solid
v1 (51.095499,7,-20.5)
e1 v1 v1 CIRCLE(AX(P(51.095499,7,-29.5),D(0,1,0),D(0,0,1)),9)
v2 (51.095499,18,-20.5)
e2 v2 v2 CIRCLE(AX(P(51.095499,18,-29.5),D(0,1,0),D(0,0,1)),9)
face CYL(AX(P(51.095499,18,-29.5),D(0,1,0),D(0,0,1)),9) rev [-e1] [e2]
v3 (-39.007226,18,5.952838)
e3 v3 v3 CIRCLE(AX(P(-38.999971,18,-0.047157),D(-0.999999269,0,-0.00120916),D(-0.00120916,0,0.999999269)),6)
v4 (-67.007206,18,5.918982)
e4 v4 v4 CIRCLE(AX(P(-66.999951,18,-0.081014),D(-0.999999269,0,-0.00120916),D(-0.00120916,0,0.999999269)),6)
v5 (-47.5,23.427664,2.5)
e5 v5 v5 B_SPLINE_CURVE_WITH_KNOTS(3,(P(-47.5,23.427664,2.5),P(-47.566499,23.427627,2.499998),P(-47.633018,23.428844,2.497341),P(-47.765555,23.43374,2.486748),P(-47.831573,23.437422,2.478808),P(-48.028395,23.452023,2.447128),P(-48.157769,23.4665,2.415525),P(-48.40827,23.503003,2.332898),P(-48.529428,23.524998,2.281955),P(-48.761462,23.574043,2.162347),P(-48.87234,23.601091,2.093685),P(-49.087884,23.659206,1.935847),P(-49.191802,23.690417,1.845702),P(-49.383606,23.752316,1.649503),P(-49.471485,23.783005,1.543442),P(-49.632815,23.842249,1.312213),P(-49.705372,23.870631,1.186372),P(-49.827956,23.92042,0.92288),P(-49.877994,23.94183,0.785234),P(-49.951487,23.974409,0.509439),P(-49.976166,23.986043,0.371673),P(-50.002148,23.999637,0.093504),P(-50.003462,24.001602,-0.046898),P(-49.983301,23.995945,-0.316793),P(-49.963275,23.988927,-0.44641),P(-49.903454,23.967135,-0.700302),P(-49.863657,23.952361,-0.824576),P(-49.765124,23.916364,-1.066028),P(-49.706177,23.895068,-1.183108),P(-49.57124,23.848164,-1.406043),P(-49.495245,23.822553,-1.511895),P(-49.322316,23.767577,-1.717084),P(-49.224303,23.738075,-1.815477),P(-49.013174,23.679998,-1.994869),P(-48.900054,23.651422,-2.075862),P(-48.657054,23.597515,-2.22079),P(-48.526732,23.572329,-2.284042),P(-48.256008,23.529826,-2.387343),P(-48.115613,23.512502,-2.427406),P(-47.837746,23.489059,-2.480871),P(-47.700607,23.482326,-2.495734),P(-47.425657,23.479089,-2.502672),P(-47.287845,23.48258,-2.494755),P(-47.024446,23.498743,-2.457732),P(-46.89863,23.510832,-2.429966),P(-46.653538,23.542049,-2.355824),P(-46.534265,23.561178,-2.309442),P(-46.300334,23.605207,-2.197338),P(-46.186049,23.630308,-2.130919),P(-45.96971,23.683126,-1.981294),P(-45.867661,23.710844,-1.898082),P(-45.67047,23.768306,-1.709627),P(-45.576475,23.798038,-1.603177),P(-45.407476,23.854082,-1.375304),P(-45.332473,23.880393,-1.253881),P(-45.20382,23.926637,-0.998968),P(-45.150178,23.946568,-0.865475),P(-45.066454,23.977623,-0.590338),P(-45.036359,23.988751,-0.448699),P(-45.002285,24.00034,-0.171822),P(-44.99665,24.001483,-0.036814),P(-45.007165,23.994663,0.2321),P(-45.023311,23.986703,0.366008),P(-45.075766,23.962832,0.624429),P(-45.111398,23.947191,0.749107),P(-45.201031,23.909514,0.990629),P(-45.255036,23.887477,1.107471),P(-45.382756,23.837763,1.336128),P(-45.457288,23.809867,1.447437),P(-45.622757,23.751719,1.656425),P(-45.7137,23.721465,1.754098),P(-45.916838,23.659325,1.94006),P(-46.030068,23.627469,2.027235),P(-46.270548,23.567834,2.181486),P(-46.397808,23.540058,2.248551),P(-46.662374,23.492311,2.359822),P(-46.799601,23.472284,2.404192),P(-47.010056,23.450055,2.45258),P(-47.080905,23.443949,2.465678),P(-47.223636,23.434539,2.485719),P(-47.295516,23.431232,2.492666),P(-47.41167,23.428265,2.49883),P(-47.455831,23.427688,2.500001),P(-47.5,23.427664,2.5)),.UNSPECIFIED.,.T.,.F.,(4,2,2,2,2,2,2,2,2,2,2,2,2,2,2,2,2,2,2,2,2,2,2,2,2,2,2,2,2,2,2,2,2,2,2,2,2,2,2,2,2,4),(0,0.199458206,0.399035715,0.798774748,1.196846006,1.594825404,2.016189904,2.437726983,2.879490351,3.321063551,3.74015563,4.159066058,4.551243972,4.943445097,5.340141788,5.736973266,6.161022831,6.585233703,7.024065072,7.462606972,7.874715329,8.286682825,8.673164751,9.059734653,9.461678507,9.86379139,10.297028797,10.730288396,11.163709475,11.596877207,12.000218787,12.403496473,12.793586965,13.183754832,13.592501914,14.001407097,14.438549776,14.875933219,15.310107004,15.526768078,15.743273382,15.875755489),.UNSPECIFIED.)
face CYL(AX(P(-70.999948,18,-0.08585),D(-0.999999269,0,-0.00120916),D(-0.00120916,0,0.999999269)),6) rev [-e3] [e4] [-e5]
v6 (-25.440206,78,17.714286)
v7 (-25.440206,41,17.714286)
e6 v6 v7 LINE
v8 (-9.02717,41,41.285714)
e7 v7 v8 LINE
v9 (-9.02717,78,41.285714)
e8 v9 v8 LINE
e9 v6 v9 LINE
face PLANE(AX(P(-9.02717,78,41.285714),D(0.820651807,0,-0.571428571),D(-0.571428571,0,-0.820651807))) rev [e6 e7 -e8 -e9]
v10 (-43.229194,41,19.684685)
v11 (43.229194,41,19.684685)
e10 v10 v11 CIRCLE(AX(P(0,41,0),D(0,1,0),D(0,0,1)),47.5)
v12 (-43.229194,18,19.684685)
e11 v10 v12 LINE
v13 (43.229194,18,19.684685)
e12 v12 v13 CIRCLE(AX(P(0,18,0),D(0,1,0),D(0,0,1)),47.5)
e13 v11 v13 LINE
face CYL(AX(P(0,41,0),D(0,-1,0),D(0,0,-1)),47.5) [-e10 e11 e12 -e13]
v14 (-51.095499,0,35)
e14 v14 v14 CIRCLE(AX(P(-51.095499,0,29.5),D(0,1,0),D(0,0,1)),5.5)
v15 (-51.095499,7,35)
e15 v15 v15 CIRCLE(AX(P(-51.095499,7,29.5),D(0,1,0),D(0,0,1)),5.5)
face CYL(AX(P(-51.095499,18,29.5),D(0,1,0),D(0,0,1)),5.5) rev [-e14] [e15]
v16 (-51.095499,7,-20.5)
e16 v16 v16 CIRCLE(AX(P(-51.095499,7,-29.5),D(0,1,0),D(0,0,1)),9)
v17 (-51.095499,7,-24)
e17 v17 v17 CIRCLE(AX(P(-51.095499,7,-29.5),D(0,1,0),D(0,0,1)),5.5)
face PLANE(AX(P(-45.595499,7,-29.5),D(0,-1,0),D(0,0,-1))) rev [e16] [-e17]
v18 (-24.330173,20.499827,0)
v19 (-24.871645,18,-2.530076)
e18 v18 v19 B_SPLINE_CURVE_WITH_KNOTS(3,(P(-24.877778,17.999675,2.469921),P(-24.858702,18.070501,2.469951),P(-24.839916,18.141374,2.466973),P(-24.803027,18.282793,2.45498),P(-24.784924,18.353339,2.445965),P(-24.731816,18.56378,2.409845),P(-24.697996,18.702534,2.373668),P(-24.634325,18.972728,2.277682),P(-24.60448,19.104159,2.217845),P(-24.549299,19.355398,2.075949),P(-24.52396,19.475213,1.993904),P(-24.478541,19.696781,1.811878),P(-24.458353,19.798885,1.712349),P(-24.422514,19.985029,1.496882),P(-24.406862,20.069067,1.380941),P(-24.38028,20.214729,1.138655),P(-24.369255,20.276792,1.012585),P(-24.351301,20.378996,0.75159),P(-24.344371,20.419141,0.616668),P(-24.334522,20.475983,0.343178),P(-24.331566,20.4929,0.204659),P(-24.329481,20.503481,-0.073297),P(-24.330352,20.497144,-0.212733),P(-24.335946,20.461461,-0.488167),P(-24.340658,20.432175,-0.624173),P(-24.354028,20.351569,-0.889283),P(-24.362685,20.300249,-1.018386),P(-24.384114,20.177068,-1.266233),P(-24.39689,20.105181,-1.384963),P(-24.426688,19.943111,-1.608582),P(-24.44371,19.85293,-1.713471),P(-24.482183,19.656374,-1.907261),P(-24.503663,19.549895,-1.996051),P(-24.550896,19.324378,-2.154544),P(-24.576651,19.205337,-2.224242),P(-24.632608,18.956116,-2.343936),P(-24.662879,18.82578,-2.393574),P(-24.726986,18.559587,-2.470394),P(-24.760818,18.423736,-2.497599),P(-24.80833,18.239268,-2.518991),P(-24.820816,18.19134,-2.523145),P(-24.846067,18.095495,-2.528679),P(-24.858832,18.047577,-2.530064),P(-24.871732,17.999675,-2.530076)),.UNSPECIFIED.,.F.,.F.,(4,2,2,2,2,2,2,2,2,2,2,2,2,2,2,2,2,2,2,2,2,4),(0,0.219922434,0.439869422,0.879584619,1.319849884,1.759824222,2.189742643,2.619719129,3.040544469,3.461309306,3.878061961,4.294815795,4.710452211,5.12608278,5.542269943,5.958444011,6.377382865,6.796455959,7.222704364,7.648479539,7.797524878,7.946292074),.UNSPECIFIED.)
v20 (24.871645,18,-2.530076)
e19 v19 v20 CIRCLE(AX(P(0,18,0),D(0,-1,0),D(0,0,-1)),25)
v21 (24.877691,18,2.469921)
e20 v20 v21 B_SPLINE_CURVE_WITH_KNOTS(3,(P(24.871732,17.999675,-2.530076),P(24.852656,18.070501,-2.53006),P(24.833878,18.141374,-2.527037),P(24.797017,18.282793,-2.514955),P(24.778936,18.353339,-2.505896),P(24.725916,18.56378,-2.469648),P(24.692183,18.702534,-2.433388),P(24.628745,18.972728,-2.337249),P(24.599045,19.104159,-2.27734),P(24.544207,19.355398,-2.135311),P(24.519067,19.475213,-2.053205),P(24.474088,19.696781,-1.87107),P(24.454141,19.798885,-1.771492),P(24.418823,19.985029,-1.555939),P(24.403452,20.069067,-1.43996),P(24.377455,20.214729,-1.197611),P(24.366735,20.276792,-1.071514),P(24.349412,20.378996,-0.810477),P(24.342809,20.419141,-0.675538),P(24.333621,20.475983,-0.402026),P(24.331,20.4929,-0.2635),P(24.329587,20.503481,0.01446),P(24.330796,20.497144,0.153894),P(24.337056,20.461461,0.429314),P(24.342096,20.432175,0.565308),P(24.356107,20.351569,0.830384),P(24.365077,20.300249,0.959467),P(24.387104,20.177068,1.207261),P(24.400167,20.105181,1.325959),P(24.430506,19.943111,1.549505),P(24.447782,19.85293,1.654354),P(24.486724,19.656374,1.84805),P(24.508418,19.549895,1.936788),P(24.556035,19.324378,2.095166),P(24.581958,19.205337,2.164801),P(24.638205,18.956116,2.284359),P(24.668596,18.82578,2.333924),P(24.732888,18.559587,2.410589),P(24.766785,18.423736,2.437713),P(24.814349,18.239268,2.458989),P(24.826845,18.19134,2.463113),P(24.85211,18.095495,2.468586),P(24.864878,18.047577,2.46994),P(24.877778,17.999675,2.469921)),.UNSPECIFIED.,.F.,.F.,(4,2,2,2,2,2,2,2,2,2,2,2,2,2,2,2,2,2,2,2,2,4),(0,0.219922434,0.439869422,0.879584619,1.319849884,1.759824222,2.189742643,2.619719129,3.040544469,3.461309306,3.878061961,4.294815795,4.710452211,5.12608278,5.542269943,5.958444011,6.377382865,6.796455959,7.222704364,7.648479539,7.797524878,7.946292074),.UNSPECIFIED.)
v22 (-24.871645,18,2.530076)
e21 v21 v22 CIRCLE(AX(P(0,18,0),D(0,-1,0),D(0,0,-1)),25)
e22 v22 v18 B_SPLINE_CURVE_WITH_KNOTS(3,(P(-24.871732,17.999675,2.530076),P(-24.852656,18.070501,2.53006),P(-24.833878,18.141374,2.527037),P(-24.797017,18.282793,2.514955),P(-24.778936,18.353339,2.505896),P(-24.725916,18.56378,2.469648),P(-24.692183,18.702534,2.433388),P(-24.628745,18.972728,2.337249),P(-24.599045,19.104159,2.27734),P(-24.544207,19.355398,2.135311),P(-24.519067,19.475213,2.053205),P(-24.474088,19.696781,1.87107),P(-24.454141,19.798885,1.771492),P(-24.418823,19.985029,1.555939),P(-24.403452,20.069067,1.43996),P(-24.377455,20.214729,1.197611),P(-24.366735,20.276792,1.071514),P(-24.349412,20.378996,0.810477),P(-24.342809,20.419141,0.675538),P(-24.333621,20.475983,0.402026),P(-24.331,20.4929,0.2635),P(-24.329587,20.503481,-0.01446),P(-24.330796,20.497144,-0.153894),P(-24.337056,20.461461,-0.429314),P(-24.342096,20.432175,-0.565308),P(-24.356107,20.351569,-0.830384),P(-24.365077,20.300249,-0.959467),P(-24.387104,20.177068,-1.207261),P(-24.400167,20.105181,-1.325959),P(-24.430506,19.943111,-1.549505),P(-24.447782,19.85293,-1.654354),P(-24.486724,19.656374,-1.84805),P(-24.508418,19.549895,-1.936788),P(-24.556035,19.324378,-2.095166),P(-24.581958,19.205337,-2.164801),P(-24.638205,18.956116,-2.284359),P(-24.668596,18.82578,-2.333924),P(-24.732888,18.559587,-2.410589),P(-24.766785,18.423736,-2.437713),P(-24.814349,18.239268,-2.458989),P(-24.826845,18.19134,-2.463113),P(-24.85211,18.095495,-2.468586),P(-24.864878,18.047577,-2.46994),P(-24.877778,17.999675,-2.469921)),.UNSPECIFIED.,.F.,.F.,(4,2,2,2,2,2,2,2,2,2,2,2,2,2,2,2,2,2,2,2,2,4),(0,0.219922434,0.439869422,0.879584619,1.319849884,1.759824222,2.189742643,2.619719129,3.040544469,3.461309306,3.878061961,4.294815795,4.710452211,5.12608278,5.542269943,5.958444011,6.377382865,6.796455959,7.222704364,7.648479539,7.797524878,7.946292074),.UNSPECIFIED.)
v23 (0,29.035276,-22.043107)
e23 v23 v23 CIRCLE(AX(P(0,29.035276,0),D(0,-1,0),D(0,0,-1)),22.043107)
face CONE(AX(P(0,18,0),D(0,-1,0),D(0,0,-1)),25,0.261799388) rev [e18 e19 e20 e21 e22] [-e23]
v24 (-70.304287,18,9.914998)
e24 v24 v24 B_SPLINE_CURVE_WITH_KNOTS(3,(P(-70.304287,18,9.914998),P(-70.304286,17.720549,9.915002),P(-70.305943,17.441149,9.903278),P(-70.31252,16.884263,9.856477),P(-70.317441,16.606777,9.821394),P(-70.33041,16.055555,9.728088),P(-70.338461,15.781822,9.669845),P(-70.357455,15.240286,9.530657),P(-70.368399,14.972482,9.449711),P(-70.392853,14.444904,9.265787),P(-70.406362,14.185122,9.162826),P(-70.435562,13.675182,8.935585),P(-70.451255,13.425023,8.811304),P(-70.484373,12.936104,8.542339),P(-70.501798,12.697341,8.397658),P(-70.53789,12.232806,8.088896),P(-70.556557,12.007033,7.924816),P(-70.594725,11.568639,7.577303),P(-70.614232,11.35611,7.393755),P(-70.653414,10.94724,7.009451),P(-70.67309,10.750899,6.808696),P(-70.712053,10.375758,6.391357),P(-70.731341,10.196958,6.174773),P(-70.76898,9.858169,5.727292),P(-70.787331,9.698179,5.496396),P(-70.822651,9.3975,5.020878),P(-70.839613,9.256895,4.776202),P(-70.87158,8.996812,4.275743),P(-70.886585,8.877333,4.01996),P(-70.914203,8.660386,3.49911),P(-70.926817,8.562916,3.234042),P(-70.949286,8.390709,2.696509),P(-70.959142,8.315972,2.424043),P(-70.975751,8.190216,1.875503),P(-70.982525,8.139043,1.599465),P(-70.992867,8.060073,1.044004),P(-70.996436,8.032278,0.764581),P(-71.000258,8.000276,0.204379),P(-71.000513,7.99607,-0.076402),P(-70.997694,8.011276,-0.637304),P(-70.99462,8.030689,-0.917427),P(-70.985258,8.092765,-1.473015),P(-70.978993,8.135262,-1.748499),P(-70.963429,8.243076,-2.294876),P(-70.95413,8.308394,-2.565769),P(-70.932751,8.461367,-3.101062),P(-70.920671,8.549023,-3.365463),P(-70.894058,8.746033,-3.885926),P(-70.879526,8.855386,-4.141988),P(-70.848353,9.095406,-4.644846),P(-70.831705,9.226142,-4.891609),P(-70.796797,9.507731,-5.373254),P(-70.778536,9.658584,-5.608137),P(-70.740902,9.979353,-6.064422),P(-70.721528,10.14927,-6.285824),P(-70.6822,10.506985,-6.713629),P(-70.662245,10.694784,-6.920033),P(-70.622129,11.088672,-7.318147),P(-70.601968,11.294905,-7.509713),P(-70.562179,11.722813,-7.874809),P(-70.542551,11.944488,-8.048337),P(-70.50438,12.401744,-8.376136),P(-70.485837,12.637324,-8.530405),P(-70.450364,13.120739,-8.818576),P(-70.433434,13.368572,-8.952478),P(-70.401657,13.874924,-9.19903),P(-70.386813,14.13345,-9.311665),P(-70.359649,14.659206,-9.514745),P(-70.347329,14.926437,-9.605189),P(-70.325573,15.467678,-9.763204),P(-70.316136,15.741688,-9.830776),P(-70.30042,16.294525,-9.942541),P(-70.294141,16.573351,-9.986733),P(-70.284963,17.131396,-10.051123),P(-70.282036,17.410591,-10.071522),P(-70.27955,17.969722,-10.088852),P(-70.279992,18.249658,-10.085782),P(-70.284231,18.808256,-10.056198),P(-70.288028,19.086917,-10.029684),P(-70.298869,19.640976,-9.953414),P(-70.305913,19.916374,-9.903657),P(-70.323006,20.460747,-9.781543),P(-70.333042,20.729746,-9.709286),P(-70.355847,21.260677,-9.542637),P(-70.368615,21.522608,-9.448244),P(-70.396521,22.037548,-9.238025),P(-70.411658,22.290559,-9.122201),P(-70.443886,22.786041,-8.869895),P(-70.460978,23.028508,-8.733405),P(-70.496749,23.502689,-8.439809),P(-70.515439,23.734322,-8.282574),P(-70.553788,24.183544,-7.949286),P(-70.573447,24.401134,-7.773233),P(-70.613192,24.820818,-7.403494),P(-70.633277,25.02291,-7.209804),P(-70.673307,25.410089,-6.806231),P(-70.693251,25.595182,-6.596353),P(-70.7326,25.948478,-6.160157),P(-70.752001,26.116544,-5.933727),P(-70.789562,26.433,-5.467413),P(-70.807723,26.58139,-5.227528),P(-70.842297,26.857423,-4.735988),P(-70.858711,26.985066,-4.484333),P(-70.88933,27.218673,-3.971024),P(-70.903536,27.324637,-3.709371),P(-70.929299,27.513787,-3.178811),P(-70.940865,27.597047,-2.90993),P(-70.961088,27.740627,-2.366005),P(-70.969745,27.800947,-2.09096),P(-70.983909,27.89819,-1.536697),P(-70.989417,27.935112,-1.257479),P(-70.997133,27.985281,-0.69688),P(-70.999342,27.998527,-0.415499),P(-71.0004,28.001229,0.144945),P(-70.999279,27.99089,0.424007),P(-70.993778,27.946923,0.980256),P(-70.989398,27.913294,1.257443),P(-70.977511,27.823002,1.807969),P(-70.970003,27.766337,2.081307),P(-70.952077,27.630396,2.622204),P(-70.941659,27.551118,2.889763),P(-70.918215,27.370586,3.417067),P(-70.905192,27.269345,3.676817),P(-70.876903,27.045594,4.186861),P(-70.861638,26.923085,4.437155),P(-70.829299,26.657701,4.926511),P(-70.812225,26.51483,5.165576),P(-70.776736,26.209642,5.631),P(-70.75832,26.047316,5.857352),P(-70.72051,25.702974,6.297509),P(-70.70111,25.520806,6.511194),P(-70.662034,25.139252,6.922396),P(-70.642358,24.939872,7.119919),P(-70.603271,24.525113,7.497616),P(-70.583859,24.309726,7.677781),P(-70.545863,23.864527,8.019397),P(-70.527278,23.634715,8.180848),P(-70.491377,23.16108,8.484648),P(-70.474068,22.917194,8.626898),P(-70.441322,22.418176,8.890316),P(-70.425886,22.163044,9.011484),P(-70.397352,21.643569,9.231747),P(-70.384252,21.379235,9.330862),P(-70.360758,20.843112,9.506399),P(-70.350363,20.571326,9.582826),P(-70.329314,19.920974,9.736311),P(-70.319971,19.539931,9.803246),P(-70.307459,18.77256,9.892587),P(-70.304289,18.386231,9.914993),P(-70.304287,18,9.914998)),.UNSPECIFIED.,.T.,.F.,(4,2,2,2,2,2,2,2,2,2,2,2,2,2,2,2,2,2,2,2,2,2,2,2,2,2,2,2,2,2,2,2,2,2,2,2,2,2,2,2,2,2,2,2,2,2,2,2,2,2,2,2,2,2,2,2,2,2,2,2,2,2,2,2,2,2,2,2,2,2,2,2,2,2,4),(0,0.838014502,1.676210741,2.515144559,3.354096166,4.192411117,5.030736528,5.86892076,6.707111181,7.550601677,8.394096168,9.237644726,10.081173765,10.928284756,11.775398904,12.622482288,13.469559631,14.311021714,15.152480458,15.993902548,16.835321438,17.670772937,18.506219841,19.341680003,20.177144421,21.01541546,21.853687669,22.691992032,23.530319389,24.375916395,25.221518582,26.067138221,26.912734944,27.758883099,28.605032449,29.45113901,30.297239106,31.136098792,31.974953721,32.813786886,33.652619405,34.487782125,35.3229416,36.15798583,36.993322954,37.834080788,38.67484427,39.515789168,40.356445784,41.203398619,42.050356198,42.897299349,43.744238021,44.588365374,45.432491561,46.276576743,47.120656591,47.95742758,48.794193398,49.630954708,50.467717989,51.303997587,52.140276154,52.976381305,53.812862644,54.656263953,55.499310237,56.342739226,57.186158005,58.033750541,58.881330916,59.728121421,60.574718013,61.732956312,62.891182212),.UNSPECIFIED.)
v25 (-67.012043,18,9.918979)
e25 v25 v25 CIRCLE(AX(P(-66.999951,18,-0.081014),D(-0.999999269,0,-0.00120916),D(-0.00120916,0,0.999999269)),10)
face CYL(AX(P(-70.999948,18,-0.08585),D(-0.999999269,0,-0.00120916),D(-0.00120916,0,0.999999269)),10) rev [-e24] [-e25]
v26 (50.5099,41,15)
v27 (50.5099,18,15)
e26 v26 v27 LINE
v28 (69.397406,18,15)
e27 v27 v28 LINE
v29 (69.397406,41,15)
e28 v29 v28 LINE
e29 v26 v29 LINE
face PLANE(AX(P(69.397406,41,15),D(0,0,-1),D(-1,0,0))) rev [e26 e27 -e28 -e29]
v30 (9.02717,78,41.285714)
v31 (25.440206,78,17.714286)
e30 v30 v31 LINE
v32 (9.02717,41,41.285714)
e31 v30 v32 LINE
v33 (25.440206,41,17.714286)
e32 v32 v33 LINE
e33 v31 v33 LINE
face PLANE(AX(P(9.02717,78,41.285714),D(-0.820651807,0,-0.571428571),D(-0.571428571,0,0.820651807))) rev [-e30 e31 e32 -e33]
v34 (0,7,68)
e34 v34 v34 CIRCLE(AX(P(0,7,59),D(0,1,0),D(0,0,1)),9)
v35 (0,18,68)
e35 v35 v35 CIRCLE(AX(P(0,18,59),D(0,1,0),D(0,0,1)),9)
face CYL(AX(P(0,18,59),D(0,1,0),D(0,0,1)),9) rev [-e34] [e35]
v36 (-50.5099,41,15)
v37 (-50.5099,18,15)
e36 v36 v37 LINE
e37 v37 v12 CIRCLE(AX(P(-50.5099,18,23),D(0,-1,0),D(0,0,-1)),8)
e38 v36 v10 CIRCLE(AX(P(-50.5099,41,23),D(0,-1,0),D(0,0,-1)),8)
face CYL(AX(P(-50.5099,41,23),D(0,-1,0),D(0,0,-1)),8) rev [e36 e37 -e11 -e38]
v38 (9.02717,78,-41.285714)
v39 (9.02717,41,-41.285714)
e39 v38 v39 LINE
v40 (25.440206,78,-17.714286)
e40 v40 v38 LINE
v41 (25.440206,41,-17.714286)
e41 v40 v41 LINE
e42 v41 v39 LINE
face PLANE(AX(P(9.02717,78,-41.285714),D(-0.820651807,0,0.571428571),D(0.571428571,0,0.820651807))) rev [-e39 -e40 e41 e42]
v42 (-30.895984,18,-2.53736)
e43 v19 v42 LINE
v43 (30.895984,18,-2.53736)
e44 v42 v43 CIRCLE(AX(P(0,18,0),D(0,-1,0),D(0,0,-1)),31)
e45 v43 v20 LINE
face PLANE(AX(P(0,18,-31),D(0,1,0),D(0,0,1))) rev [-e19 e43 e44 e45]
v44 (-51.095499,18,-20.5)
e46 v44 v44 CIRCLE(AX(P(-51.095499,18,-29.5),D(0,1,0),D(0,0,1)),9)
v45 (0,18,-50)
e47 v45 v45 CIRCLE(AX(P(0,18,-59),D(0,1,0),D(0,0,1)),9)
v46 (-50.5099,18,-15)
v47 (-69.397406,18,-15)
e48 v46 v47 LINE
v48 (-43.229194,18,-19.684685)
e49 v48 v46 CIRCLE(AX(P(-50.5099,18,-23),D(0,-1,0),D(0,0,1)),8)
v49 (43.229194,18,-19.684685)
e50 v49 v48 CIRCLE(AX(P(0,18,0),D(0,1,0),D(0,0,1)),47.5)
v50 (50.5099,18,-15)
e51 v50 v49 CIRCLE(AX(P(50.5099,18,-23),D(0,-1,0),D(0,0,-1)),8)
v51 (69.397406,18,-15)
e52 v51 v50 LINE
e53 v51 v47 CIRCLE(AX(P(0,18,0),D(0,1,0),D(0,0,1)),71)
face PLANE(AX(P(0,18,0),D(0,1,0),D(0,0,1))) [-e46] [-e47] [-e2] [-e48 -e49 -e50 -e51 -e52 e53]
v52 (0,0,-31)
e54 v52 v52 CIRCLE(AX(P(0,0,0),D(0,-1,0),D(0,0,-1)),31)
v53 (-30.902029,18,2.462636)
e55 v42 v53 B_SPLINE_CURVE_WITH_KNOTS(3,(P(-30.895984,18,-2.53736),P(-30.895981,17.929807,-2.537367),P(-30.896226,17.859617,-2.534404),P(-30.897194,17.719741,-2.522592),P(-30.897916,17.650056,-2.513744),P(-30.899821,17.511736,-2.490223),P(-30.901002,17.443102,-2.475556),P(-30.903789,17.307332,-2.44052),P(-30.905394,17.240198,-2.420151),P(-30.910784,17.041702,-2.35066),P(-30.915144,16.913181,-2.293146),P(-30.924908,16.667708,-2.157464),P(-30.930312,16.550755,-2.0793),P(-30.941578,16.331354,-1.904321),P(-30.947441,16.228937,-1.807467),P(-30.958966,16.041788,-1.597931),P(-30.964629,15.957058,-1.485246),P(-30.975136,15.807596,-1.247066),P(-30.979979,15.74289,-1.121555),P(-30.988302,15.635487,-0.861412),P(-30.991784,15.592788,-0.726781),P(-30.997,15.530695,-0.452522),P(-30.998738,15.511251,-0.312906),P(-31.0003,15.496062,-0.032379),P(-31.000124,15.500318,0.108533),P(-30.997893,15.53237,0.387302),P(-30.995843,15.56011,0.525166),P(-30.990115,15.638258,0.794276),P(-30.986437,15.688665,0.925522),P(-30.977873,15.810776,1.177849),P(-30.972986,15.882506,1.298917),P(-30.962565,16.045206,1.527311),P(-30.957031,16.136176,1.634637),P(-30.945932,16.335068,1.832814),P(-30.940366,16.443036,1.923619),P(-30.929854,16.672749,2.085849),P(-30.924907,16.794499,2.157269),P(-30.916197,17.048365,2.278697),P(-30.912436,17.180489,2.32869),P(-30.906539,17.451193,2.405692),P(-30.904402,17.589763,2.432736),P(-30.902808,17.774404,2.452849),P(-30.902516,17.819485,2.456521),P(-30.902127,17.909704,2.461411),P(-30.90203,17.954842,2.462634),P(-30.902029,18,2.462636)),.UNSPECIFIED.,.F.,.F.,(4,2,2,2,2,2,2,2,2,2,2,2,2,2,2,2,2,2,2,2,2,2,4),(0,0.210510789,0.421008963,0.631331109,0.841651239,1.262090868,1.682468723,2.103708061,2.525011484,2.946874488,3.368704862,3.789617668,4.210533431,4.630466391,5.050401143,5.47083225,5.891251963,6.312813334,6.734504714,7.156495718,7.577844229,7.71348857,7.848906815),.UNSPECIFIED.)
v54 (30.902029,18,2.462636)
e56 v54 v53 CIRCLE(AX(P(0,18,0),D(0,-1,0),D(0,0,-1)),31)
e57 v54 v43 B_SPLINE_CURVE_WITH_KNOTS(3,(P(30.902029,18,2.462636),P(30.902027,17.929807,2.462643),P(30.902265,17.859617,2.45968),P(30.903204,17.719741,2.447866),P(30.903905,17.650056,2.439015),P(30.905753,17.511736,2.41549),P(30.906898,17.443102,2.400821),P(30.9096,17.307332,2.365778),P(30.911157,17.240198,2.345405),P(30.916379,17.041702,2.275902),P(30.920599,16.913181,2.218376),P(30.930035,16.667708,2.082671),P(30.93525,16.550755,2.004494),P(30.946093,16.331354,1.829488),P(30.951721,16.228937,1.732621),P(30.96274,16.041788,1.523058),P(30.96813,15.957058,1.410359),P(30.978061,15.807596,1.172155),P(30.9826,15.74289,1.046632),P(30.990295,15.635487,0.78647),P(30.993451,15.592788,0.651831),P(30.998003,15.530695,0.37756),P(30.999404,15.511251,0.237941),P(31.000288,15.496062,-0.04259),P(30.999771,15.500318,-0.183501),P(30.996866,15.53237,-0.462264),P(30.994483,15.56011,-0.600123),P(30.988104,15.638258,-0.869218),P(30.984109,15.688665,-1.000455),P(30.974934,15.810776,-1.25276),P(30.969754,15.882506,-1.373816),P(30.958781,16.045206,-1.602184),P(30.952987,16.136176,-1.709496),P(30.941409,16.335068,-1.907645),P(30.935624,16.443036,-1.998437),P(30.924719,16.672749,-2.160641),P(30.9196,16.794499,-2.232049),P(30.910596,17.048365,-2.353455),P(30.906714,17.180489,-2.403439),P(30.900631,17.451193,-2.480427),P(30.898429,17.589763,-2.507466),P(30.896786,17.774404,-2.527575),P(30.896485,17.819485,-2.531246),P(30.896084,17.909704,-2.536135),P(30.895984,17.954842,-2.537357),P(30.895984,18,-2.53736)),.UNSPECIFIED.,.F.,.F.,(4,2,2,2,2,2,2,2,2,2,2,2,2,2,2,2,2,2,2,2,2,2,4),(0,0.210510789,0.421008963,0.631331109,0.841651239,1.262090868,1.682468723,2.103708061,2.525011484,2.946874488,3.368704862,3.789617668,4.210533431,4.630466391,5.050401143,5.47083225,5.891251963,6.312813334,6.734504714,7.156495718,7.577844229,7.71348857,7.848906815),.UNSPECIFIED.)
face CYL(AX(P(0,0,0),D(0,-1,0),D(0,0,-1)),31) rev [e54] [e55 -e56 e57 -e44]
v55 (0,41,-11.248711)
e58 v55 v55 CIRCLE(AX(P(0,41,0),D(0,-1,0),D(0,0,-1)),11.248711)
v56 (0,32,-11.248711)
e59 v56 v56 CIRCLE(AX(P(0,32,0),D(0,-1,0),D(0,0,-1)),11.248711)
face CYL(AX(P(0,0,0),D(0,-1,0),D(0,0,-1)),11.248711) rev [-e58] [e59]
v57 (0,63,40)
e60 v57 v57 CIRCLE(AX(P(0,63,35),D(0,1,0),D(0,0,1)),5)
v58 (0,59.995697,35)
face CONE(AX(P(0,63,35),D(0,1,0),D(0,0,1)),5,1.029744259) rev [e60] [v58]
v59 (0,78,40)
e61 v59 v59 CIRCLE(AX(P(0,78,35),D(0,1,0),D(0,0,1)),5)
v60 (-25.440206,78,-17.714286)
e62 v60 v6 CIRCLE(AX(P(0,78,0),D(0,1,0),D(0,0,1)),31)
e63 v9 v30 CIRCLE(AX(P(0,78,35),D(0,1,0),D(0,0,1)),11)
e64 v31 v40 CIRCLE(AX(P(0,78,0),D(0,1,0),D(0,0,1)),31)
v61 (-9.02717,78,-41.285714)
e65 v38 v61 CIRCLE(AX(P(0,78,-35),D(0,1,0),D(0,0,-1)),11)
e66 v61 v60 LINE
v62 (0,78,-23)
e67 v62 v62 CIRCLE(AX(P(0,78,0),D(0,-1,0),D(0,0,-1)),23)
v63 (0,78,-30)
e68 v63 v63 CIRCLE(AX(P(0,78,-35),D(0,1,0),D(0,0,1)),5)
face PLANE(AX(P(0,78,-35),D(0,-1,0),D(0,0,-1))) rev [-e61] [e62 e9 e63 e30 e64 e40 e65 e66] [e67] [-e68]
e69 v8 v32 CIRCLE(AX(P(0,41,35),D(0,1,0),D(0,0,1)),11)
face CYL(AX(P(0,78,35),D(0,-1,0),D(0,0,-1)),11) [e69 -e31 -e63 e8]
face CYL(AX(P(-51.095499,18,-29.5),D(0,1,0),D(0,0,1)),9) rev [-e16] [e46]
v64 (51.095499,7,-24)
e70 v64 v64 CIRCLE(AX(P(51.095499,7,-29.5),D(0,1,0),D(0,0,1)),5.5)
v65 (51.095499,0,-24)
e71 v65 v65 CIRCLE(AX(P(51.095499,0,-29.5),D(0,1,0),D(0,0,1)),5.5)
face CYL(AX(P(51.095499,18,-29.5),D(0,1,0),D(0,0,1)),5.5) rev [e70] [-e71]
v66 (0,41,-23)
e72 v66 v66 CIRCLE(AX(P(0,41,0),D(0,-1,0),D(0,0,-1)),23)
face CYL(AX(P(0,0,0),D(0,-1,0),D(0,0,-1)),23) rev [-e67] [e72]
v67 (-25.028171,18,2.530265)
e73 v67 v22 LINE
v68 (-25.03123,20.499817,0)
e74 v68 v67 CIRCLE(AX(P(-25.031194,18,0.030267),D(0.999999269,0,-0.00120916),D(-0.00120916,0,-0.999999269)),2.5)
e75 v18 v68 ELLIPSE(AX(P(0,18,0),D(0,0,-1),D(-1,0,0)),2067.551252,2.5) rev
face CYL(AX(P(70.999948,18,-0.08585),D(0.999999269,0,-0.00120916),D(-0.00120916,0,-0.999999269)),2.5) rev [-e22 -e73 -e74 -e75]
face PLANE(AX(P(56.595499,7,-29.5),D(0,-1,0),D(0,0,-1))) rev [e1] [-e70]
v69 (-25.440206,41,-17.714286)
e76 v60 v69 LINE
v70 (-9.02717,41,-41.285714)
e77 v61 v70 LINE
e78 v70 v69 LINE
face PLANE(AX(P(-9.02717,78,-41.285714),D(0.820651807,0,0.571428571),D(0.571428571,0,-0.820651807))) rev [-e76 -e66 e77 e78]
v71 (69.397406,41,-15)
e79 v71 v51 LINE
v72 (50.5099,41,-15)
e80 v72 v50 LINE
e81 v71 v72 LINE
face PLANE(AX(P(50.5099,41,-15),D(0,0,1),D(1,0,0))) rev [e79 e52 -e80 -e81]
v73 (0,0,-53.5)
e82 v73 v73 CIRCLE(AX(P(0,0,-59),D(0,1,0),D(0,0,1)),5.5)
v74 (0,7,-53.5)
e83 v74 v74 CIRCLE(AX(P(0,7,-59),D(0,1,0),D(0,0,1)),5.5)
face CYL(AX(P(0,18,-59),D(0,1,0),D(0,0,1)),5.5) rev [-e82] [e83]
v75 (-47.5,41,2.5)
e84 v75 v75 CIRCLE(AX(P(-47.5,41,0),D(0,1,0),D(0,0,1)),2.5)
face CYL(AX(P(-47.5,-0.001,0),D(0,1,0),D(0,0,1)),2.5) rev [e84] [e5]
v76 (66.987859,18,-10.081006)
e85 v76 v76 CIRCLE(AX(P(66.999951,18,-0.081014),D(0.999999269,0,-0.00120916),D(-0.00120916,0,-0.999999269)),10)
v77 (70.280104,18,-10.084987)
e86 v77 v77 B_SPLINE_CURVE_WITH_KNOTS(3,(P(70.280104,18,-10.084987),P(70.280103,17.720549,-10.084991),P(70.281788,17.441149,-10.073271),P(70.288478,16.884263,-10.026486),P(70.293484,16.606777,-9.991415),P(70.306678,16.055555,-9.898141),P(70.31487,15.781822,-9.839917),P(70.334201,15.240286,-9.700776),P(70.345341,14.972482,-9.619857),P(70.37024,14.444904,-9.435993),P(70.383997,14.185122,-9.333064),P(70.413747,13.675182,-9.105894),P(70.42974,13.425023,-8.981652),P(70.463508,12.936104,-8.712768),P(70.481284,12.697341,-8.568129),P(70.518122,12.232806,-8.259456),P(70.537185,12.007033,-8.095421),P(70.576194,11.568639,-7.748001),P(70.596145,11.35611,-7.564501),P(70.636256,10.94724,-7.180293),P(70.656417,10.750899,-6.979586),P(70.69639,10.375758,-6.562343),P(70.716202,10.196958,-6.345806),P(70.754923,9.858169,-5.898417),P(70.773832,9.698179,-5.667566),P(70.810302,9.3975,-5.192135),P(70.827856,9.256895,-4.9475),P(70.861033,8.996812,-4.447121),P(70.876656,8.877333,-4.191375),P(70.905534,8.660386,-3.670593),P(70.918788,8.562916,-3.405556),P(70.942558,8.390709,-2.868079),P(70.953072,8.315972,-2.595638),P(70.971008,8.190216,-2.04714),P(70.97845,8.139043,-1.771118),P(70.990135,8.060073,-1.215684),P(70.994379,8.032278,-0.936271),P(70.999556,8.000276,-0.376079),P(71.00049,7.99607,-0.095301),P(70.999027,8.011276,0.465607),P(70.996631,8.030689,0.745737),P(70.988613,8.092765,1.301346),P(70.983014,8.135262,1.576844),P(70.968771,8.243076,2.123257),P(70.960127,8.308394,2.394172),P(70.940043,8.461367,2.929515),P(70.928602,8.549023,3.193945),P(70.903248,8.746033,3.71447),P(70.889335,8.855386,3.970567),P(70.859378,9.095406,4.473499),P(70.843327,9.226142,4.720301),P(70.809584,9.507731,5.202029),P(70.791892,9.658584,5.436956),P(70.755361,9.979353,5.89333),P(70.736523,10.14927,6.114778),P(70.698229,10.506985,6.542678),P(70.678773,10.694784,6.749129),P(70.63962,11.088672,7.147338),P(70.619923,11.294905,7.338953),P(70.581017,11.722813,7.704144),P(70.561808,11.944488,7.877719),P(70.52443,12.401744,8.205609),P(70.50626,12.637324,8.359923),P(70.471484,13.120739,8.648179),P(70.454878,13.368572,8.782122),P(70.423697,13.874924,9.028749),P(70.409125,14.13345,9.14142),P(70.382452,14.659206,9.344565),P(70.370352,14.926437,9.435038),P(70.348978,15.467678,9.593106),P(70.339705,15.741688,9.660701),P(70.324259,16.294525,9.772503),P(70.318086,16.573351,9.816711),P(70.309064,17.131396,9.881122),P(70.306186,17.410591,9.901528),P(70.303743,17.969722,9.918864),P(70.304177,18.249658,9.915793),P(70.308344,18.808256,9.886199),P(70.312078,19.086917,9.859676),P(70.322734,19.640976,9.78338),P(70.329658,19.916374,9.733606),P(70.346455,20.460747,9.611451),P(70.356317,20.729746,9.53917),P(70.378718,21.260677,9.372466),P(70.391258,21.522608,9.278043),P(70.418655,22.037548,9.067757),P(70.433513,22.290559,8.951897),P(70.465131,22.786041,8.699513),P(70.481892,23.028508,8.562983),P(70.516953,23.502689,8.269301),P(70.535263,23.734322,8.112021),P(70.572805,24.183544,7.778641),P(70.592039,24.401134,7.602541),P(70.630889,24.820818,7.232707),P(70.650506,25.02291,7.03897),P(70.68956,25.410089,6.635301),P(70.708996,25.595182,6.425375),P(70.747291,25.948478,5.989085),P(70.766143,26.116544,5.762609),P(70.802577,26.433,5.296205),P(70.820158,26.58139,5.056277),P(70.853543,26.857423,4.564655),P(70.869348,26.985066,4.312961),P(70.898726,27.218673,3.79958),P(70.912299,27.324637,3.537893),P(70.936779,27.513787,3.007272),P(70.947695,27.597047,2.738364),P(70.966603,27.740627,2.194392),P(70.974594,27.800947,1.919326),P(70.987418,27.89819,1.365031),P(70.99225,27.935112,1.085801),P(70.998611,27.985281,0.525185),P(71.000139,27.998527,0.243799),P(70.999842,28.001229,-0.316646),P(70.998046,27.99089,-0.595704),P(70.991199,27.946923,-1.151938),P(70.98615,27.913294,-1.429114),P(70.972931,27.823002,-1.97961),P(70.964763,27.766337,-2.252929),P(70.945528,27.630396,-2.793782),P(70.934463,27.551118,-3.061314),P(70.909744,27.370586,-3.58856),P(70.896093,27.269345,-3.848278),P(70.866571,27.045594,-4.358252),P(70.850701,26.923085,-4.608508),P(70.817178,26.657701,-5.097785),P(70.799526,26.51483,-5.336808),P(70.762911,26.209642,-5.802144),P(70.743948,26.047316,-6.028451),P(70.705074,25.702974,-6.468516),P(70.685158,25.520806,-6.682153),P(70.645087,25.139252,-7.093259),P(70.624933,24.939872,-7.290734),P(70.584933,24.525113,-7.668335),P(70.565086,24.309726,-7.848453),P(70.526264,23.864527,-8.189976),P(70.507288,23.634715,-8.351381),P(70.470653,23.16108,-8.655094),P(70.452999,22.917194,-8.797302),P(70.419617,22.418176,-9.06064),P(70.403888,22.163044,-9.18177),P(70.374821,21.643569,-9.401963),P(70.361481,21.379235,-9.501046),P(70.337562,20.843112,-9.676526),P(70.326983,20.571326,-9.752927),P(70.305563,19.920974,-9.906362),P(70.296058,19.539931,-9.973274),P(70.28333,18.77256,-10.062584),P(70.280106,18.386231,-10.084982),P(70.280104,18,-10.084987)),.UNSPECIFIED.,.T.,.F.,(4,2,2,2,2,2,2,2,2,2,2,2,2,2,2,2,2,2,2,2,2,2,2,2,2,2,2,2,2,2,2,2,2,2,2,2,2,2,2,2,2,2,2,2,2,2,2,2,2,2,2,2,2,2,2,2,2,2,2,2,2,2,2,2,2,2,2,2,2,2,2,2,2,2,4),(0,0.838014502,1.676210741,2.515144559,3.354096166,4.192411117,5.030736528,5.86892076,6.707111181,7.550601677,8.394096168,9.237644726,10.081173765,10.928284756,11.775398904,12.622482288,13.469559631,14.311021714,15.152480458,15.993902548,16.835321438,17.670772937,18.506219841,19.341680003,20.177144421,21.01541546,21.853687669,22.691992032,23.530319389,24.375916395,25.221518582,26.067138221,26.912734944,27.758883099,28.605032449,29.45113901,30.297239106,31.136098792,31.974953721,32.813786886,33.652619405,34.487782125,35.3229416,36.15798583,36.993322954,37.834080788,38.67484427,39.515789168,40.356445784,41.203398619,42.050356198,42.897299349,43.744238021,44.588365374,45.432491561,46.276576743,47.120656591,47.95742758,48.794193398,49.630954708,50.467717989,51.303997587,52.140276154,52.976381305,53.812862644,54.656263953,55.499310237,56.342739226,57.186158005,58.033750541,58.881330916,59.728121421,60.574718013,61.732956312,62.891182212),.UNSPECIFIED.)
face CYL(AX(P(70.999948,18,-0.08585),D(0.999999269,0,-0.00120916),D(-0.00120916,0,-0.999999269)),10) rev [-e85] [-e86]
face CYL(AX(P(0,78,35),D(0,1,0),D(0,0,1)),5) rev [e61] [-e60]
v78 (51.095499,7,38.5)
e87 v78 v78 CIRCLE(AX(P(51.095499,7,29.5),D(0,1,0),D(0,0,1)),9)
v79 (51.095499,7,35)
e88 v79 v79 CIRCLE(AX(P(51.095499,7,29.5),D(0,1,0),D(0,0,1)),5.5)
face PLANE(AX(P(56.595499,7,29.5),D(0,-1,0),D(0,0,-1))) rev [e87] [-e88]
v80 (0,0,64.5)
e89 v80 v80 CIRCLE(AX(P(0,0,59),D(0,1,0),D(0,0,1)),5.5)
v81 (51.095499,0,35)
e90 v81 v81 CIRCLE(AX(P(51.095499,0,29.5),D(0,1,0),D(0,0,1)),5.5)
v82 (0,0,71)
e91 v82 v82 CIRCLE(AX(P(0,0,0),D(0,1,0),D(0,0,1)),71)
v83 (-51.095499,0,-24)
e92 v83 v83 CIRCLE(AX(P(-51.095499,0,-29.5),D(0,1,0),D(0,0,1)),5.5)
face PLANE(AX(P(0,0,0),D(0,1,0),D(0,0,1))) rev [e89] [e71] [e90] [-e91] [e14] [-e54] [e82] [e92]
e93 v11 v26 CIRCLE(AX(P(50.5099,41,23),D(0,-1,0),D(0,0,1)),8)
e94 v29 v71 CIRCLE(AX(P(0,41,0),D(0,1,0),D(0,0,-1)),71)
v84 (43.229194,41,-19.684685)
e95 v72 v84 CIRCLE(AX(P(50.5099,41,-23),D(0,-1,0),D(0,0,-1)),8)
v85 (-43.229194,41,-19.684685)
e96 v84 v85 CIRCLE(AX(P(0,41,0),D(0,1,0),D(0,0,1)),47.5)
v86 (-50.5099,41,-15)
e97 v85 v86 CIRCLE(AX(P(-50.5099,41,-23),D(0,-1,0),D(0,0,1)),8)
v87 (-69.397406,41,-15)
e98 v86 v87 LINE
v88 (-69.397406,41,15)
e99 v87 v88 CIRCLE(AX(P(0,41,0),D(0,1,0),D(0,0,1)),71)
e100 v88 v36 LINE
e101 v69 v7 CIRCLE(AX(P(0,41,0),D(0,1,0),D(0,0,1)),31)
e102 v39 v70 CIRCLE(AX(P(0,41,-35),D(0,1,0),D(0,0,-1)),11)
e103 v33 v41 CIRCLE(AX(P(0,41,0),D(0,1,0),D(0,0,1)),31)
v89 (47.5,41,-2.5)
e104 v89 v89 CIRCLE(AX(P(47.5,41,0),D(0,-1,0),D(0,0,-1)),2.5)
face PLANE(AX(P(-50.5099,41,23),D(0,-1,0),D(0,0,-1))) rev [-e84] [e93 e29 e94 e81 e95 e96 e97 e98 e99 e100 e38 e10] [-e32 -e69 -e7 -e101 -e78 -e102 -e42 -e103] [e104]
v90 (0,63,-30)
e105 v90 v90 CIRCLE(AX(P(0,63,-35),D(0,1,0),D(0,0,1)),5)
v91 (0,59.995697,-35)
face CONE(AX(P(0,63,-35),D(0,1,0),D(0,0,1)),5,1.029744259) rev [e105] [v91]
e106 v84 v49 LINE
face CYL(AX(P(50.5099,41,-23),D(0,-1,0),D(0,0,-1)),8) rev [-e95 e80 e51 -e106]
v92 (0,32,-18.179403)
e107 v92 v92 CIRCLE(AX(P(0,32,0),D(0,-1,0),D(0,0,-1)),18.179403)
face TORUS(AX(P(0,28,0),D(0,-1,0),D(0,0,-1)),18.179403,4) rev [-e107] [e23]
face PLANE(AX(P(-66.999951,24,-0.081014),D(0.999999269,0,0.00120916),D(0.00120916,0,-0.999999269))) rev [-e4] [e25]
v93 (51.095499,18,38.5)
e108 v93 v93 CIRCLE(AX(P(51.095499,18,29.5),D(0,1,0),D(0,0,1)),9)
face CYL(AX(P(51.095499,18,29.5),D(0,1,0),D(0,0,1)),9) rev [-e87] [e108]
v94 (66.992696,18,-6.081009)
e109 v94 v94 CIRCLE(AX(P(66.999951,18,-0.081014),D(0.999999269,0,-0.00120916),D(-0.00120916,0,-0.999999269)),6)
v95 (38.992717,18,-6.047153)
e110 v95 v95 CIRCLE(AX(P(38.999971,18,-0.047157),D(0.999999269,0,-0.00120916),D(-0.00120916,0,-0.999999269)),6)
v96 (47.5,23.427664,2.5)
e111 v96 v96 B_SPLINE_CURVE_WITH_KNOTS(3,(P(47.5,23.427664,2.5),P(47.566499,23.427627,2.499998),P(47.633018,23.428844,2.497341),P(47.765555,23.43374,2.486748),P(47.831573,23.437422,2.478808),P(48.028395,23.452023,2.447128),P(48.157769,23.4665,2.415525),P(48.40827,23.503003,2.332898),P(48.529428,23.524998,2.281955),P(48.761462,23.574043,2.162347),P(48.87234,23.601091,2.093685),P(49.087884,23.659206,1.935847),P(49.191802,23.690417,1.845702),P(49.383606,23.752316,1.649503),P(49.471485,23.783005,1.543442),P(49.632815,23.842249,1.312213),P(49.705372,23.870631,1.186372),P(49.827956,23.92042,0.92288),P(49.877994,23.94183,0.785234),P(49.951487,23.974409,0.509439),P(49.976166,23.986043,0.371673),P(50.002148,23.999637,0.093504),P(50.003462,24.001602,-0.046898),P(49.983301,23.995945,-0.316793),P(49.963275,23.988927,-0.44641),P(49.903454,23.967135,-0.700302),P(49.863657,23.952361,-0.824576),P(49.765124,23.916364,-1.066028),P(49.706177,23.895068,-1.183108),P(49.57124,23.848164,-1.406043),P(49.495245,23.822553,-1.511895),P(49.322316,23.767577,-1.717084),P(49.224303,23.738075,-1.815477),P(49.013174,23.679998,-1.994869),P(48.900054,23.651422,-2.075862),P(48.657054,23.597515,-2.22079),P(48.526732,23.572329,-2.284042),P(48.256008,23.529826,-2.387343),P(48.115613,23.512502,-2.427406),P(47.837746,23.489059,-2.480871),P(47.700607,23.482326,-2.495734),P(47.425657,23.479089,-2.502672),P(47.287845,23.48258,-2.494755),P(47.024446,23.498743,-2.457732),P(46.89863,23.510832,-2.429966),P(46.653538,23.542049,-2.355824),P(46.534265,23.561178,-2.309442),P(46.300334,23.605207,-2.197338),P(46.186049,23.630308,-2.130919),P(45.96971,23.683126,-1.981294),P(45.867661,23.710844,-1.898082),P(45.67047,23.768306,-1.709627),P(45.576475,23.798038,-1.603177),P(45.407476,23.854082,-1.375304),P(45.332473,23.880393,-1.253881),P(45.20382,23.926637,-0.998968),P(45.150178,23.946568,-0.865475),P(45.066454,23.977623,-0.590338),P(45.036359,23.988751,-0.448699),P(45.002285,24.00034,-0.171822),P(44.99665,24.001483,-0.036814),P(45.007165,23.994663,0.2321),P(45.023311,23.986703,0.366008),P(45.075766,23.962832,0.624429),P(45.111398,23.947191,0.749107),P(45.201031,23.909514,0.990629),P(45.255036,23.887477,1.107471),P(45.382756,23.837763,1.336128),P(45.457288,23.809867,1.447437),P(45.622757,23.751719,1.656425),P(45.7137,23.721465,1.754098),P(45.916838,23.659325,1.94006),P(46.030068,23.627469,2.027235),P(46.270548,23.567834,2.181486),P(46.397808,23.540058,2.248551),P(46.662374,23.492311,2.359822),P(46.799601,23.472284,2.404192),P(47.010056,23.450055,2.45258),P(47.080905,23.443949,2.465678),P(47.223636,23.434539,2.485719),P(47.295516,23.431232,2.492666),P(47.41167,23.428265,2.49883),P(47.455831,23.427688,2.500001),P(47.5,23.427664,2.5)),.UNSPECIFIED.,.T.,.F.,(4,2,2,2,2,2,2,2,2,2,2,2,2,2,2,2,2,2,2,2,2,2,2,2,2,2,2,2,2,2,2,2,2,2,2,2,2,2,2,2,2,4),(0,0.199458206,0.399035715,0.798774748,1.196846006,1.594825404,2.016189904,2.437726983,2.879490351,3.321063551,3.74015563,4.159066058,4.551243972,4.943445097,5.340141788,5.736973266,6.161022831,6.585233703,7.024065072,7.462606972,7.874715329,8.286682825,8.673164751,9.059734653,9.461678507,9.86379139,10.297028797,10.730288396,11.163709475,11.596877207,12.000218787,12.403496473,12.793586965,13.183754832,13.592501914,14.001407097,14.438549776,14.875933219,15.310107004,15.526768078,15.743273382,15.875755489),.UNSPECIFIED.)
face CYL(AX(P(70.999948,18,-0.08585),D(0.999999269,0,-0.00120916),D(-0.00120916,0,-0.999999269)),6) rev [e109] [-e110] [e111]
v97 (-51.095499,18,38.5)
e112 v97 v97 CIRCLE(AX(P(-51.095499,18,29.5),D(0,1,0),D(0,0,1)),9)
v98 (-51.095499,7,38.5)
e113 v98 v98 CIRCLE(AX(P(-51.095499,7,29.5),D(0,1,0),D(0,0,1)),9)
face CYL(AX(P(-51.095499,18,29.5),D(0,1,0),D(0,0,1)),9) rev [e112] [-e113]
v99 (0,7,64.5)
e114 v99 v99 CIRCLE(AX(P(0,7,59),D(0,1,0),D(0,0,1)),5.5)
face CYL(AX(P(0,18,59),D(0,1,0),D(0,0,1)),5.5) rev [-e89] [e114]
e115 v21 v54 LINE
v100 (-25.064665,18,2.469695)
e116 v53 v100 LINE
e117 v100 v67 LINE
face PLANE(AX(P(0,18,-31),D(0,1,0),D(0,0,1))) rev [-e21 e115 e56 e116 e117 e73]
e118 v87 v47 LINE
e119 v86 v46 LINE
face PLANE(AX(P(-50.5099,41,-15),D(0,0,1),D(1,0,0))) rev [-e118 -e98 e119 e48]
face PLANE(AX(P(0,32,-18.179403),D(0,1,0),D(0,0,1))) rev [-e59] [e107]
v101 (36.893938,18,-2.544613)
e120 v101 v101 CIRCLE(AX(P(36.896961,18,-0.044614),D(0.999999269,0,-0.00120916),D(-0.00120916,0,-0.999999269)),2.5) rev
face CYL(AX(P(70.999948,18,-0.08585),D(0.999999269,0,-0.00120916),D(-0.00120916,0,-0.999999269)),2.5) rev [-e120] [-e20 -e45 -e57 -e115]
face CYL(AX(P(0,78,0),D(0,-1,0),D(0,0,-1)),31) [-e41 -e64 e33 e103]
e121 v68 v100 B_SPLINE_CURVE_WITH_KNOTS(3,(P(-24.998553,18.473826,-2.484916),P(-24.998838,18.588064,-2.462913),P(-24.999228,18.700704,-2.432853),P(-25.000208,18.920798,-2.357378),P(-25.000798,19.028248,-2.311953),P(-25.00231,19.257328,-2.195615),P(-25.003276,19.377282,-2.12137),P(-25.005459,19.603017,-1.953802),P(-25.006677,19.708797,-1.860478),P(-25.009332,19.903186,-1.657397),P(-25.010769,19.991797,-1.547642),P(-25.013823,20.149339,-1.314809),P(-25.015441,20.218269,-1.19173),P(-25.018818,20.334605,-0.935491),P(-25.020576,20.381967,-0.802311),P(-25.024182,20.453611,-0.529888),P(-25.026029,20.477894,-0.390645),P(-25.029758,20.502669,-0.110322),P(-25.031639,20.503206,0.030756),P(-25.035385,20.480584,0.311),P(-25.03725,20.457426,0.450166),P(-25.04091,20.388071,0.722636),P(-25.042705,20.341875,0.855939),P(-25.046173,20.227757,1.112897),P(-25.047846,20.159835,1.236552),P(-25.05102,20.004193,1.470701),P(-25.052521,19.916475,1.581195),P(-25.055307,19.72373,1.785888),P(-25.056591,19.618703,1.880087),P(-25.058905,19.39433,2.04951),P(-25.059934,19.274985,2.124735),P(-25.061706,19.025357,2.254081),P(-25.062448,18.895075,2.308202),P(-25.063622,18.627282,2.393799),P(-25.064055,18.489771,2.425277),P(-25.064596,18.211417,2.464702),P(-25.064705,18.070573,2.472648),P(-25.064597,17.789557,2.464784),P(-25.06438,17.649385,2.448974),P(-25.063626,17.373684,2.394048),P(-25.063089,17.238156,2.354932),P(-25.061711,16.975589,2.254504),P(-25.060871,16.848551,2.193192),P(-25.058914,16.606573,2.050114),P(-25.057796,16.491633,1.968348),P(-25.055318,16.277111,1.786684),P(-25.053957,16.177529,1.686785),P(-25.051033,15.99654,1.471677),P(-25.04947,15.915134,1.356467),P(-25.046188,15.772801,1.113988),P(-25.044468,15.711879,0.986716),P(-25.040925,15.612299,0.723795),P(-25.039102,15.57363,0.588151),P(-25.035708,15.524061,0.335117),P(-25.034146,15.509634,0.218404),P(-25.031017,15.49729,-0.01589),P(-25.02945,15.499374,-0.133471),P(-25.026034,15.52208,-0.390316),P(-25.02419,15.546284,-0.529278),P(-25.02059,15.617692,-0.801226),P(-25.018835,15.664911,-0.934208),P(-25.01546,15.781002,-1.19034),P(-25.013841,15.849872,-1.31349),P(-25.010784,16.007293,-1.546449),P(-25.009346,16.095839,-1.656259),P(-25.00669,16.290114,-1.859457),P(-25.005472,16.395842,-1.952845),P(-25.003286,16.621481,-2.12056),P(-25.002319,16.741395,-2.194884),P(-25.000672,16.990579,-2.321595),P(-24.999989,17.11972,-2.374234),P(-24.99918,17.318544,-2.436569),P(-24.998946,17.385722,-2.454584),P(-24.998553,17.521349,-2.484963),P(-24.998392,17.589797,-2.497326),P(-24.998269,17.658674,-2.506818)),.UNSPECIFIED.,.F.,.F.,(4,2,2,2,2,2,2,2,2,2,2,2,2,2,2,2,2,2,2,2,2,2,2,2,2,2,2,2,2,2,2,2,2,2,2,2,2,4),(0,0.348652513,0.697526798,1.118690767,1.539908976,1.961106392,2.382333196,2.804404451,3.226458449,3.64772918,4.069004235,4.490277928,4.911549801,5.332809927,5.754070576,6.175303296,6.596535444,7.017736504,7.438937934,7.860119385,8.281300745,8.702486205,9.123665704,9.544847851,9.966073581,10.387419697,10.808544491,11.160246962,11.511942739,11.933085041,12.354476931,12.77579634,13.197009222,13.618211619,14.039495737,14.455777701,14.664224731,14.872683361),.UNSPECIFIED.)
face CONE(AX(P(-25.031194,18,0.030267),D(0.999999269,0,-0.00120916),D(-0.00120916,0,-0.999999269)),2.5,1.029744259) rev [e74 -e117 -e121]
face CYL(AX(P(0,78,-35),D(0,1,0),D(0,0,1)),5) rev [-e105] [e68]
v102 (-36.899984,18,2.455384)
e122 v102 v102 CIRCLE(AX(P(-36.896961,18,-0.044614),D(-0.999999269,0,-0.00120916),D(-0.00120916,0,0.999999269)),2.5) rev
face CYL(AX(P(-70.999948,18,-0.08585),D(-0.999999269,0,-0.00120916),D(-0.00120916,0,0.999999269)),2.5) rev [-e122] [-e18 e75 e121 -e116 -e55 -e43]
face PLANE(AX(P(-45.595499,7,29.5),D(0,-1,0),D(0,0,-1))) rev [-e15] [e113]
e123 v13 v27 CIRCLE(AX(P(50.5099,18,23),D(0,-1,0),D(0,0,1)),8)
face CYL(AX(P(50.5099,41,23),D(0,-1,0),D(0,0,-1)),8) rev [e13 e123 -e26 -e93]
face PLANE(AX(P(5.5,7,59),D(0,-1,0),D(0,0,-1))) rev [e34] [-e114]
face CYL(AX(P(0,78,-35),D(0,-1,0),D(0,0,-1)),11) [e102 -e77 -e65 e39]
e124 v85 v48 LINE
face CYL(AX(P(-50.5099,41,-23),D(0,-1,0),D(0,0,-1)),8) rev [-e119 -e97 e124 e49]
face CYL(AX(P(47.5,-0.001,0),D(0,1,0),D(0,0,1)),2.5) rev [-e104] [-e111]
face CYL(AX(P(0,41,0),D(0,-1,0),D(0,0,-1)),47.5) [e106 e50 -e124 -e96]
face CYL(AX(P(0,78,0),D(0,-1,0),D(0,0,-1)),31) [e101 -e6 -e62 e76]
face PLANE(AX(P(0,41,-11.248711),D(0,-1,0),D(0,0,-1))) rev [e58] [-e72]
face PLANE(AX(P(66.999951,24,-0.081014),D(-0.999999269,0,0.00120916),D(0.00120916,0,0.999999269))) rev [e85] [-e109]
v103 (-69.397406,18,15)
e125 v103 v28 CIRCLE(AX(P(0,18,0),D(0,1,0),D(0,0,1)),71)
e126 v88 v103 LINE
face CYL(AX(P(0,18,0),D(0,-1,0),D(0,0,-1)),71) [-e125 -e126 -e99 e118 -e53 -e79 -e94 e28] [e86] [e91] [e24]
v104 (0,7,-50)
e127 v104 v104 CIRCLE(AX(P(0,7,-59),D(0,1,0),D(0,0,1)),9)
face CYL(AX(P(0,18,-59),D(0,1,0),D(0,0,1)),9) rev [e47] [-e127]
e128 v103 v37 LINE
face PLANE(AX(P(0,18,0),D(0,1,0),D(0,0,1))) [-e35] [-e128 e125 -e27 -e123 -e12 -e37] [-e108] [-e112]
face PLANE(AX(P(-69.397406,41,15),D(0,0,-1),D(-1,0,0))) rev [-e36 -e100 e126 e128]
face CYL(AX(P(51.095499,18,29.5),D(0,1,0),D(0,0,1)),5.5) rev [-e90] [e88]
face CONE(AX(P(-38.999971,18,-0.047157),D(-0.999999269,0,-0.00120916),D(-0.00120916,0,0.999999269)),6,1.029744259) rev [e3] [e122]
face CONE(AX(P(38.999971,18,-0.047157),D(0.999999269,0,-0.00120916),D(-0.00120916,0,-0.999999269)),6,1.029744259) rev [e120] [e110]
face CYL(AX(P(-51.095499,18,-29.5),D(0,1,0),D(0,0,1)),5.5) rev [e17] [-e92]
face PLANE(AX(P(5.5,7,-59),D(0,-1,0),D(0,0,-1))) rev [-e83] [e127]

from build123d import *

# Parameters (mm, degrees)
SKETCH1_R                               = 71
BOSS_EXTRUDE1_DEPTH                     = 18
BOSS_EXTRUDE2_DEPTH                     = 23
BOSS_EXTRUDE3_DEPTH                     = 37
CBORE_FOR_M5_HEX_HEAD_BOLT1_D           = 11
CBORE_FOR_M5_HEX_HEAD_BOLT1_CBORE_D     = 18
CBORE_FOR_M5_HEX_HEAD_BOLT1_CBORE_DEPTH = 11
CIRPATTERN1_COUNT                       = 6
F_10_0MM_DOWEL_HOLE1_D                  = 10
F_10_0MM_DOWEL_HOLE1_DEPTH              = 15
F_10_0MM_DOWEL_HOLE1_TIP                = 3.004303095
MIRROR2_OUTLINE_W                       = 2.5
MIRROR2_OUTLINE_H                       = 12.566951185
CUT_EXTRUDE1_REACH                      = 110.457
SKETCH17_R                              = 2.5


# Read off the part's stored shape, not the designer's step: Mirror2
with BuildPart() as part:
    # Sketch1 → Boss-Extrude1 (new body)
    with BuildSketch(Plane(origin=(0, 0, 0), x_dir=(1, 0, 0), z_dir=(0, 1, 0))):
        with Locations(Location((0, 0, 0), (0, 0, 270))):
            Circle(SKETCH1_R)
    extrude(amount=BOSS_EXTRUDE1_DEPTH)

    # Sketch2 → Boss-Extrude2 (add)
    with BuildSketch(Plane(origin=(0, 18, 0), x_dir=(1, 0, 0), z_dir=(0, 1, 0))):
        with BuildLine():
            Line((-50.50990002, 15), (-69.397406292, 15))
            ThreePointArc((-69.397406292, 15), (-71, 0), (-69.397406292, -15))
            Line((-69.397406292, -15), (-50.50990002, -15))
            ThreePointArc((-50.50990002, -15), (-46.181073535, -16.272350986), (-43.229193711, -19.684684685))
            ThreePointArc((-43.229193711, -19.684684685), (0, -47.5), (43.229193711, -19.684684685))
            ThreePointArc((43.229193711, -19.684684685), (46.181073535, -16.272350986), (50.50990002, -15))
            Line((50.50990002, -15), (69.397406292, -15))
            ThreePointArc((69.397406292, -15), (71, 0), (69.397406292, 15))
            Line((69.397406292, 15), (50.50990002, 15))
            ThreePointArc((50.50990002, 15), (46.181073535, 16.272350986), (43.229193711, 19.684684685))
            ThreePointArc((43.229193711, 19.684684685), (0, 47.5), (-43.229193711, 19.684684685))
            ThreePointArc((-43.229193711, 19.684684685), (-46.181073535, 16.272350986), (-50.50990002, 15))
        make_face()
    extrude(amount=BOSS_EXTRUDE2_DEPTH)

    # Sketch3 → Boss-Extrude3 (add)
    with BuildSketch(Plane(origin=(0, 41, 0), x_dir=(1, 0, 0), z_dir=(0, 1, 0))):
        with BuildLine():
            Line((9.027169873, -41.285714286), (25.440206006, -17.714285714))
            ThreePointArc((25.440206006, -17.714285714), (31, 0), (25.440206006, 17.714285714))
            Line((25.440206006, 17.714285714), (9.027169873, 41.285714286))
            ThreePointArc((9.027169873, 41.285714286), (0, 46), (-9.027169873, 41.285714286))
            Line((-9.027169873, 41.285714286), (-25.440206006, 17.714285714))
            ThreePointArc((-25.440206006, 17.714285714), (-31, 0), (-25.440206006, -17.714285714))
            Line((-25.440206006, -17.714285714), (-9.027169873, -41.285714286))
            ThreePointArc((-9.027169873, -41.285714286), (0, -46), (9.027169873, -41.285714286))
        make_face()
    extrude(amount=BOSS_EXTRUDE3_DEPTH)

    # CBORE for M5 Hex Head Bolt1 (through all)
    with Locations(Plane(origin=(0, 18, 59), x_dir=(0, 0, 1), z_dir=(0, 1, 0))):
        with Locations((0, 0)):
            cbore_for_m5_hex_head_bolt1 = CounterBoreHole(CBORE_FOR_M5_HEX_HEAD_BOLT1_D / 2, CBORE_FOR_M5_HEX_HEAD_BOLT1_CBORE_D / 2, CBORE_FOR_M5_HEX_HEAD_BOLT1_CBORE_DEPTH)

    # CirPattern1: CBORE for M5 Hex Head Bolt1 ×6 about axis
    cirpattern1_axis = Axis((0, 0, 0), (0, 1, 0))
    for i in range(1, CIRPATTERN1_COUNT):
        add(cbore_for_m5_hex_head_bolt1.rotate(cirpattern1_axis, i * 360 / CIRPATTERN1_COUNT), mode=Mode.SUBTRACT)

    # Ø10.0mm Dowel Hole1
    with Locations(Plane(origin=(0, 78, -35), x_dir=(0, 0, 1), z_dir=(0, 1, 0))):
        with Locations((0, 0), (70, 0)):
            Hole(F_10_0MM_DOWEL_HOLE1_D / 2, depth=F_10_0MM_DOWEL_HOLE1_DEPTH)
            with Locations((0, 0, -(F_10_0MM_DOWEL_HOLE1_DEPTH + F_10_0MM_DOWEL_HOLE1_TIP / 2))):  # 118° drill point
                Cone(0, F_10_0MM_DOWEL_HOLE1_D / 2, F_10_0MM_DOWEL_HOLE1_TIP, mode=Mode.SUBTRACT)

    # Sketch12 → Cut-Revolve3 (revolve, cut)
    with BuildSketch(Plane(origin=(0, 0, 0), x_dir=(0, 0, -1), z_dir=(1, 0, 0))):
        with BuildLine():
            Line((0, 0), (31, 0))
            Line((31, 0), (31, 18))
            Line((31, 18), (25, 18))
            Line((25, 18), (22.043106659, 29.03527618))
            ThreePointArc((22.043106659, 29.03527618), (20.61444907, 31.173413361), (18.179403354, 32))
            Line((18.179403354, 32), (11.248711306, 32))
            Line((11.248711306, 32), (11.248711306, 41))
            Line((11.248711306, 41), (23, 41))
            Line((23, 41), (23, 78))
            Line((23, 78), (0, 78))
            Line((0, 78), (0, 0))
        make_face()
    revolve(axis=Axis((0, 0, 0), (0, 1, 0)), mode=Mode.SUBTRACT)

    # Sketch13 → CBORE for M5 Hex Head Bolt2 (revolve, cut)
    with BuildSketch(Plane(origin=(-70.999948097, 18, -0.085850351), x_dir=(-0.001209159868286979, 0, 0.9999992689659393), z_dir=(0, 1, 0))):
        Polygon((0, 0), (0, 35.605163714), (6, 32), (6, 4), (10, 4), (10, 0), align=None)
    cbore_for_m5_hex_head_bolt2 = revolve(axis=Axis((-77.349943455, 18, -0.093528516), (0.9999992689659393, 0, 0.001209159868286979)), mode=Mode.SUBTRACT)

    # Mirror1: CBORE for M5 Hex Head Bolt2 across plane
    add(cbore_for_m5_hex_head_bolt2.mirror(Plane(origin=(0, 0, 0), x_dir=(0, 0, 1), z_dir=(1, 0, 0))), mode=Mode.SUBTRACT)

    # Sketch16 → Ø5.0mm Dowel Hole1 (revolve, cut)
    with BuildSketch(Plane(origin=(-70.999948097, 18, -0.085850351), x_dir=(-0.001209159868286979, 0, 0.9999992689659393), z_dir=(0, 1, 0))):
        Polygon((0, 0), (0, 72.501151548), (2.5, 70.999), (2.5, 0), align=None)
    revolve(axis=Axis((-77.349943455, 18, -0.093528516), (0.9999992689659393, 0, 0.001209159868286979)), mode=Mode.SUBTRACT)

    # Mirror2 outline → Mirror2 (revolve, cut)
    with BuildSketch(Plane(origin=(0, 18, 0), x_dir=(0, 1, 0), z_dir=(-0.0012091598682869803, 0, -0.9999992689659393))):
        with Locations((1.25, 30.613512241)):
            Rectangle(MIRROR2_OUTLINE_W, MIRROR2_OUTLINE_H)
        Polygon((2.5, -25.031211929), (2.5, -24.330096403), (2.439383393, -24.330096403), (2.439383393, -25.067634061), align=None)
    revolve(axis=Axis((0, 18, 0), (0.9999992689659393, 0, -0.0012091598682869803)), mode=Mode.SUBTRACT)

    # Sketch17 → Cut-Extrude1 (cut, up to next)
    with BuildSketch(Plane(origin=(0, 41, 0), x_dir=(1, 0, 0), z_dir=(0, 1, 0)), mode=Mode.PRIVATE) as cut_extrude1_sk1:
        with Locations(Location((-47.5, 0, 0), (0, 0, 270))):
            Circle(SKETCH17_R)
    cut_extrude1_tool1 = extrude(cut_extrude1_sk1.sketch, amount=-CUT_EXTRUDE1_REACH, mode=Mode.PRIVATE) & part.part
    # Sketch17 → Cut-Extrude1 (cut, up to next)
    with BuildSketch(Plane(origin=(0, 41, 0), x_dir=(1, 0, 0), z_dir=(0, 1, 0)), mode=Mode.PRIVATE) as cut_extrude1_sk2:
        with Locations(Location((47.5, 0, 0), (0, 0, 270))):
            Circle(SKETCH17_R)
    cut_extrude1_tool2 = extrude(cut_extrude1_sk2.sketch, amount=-CUT_EXTRUDE1_REACH, mode=Mode.PRIVATE) & part.part
    add(cut_extrude1_tool1.solids().sort_by_distance((-47.5, 41, 0))[0], mode=Mode.SUBTRACT)
    add(cut_extrude1_tool2.solids().sort_by_distance((47.5, 41, 0))[0], mode=Mode.SUBTRACT)


solid = part.part
